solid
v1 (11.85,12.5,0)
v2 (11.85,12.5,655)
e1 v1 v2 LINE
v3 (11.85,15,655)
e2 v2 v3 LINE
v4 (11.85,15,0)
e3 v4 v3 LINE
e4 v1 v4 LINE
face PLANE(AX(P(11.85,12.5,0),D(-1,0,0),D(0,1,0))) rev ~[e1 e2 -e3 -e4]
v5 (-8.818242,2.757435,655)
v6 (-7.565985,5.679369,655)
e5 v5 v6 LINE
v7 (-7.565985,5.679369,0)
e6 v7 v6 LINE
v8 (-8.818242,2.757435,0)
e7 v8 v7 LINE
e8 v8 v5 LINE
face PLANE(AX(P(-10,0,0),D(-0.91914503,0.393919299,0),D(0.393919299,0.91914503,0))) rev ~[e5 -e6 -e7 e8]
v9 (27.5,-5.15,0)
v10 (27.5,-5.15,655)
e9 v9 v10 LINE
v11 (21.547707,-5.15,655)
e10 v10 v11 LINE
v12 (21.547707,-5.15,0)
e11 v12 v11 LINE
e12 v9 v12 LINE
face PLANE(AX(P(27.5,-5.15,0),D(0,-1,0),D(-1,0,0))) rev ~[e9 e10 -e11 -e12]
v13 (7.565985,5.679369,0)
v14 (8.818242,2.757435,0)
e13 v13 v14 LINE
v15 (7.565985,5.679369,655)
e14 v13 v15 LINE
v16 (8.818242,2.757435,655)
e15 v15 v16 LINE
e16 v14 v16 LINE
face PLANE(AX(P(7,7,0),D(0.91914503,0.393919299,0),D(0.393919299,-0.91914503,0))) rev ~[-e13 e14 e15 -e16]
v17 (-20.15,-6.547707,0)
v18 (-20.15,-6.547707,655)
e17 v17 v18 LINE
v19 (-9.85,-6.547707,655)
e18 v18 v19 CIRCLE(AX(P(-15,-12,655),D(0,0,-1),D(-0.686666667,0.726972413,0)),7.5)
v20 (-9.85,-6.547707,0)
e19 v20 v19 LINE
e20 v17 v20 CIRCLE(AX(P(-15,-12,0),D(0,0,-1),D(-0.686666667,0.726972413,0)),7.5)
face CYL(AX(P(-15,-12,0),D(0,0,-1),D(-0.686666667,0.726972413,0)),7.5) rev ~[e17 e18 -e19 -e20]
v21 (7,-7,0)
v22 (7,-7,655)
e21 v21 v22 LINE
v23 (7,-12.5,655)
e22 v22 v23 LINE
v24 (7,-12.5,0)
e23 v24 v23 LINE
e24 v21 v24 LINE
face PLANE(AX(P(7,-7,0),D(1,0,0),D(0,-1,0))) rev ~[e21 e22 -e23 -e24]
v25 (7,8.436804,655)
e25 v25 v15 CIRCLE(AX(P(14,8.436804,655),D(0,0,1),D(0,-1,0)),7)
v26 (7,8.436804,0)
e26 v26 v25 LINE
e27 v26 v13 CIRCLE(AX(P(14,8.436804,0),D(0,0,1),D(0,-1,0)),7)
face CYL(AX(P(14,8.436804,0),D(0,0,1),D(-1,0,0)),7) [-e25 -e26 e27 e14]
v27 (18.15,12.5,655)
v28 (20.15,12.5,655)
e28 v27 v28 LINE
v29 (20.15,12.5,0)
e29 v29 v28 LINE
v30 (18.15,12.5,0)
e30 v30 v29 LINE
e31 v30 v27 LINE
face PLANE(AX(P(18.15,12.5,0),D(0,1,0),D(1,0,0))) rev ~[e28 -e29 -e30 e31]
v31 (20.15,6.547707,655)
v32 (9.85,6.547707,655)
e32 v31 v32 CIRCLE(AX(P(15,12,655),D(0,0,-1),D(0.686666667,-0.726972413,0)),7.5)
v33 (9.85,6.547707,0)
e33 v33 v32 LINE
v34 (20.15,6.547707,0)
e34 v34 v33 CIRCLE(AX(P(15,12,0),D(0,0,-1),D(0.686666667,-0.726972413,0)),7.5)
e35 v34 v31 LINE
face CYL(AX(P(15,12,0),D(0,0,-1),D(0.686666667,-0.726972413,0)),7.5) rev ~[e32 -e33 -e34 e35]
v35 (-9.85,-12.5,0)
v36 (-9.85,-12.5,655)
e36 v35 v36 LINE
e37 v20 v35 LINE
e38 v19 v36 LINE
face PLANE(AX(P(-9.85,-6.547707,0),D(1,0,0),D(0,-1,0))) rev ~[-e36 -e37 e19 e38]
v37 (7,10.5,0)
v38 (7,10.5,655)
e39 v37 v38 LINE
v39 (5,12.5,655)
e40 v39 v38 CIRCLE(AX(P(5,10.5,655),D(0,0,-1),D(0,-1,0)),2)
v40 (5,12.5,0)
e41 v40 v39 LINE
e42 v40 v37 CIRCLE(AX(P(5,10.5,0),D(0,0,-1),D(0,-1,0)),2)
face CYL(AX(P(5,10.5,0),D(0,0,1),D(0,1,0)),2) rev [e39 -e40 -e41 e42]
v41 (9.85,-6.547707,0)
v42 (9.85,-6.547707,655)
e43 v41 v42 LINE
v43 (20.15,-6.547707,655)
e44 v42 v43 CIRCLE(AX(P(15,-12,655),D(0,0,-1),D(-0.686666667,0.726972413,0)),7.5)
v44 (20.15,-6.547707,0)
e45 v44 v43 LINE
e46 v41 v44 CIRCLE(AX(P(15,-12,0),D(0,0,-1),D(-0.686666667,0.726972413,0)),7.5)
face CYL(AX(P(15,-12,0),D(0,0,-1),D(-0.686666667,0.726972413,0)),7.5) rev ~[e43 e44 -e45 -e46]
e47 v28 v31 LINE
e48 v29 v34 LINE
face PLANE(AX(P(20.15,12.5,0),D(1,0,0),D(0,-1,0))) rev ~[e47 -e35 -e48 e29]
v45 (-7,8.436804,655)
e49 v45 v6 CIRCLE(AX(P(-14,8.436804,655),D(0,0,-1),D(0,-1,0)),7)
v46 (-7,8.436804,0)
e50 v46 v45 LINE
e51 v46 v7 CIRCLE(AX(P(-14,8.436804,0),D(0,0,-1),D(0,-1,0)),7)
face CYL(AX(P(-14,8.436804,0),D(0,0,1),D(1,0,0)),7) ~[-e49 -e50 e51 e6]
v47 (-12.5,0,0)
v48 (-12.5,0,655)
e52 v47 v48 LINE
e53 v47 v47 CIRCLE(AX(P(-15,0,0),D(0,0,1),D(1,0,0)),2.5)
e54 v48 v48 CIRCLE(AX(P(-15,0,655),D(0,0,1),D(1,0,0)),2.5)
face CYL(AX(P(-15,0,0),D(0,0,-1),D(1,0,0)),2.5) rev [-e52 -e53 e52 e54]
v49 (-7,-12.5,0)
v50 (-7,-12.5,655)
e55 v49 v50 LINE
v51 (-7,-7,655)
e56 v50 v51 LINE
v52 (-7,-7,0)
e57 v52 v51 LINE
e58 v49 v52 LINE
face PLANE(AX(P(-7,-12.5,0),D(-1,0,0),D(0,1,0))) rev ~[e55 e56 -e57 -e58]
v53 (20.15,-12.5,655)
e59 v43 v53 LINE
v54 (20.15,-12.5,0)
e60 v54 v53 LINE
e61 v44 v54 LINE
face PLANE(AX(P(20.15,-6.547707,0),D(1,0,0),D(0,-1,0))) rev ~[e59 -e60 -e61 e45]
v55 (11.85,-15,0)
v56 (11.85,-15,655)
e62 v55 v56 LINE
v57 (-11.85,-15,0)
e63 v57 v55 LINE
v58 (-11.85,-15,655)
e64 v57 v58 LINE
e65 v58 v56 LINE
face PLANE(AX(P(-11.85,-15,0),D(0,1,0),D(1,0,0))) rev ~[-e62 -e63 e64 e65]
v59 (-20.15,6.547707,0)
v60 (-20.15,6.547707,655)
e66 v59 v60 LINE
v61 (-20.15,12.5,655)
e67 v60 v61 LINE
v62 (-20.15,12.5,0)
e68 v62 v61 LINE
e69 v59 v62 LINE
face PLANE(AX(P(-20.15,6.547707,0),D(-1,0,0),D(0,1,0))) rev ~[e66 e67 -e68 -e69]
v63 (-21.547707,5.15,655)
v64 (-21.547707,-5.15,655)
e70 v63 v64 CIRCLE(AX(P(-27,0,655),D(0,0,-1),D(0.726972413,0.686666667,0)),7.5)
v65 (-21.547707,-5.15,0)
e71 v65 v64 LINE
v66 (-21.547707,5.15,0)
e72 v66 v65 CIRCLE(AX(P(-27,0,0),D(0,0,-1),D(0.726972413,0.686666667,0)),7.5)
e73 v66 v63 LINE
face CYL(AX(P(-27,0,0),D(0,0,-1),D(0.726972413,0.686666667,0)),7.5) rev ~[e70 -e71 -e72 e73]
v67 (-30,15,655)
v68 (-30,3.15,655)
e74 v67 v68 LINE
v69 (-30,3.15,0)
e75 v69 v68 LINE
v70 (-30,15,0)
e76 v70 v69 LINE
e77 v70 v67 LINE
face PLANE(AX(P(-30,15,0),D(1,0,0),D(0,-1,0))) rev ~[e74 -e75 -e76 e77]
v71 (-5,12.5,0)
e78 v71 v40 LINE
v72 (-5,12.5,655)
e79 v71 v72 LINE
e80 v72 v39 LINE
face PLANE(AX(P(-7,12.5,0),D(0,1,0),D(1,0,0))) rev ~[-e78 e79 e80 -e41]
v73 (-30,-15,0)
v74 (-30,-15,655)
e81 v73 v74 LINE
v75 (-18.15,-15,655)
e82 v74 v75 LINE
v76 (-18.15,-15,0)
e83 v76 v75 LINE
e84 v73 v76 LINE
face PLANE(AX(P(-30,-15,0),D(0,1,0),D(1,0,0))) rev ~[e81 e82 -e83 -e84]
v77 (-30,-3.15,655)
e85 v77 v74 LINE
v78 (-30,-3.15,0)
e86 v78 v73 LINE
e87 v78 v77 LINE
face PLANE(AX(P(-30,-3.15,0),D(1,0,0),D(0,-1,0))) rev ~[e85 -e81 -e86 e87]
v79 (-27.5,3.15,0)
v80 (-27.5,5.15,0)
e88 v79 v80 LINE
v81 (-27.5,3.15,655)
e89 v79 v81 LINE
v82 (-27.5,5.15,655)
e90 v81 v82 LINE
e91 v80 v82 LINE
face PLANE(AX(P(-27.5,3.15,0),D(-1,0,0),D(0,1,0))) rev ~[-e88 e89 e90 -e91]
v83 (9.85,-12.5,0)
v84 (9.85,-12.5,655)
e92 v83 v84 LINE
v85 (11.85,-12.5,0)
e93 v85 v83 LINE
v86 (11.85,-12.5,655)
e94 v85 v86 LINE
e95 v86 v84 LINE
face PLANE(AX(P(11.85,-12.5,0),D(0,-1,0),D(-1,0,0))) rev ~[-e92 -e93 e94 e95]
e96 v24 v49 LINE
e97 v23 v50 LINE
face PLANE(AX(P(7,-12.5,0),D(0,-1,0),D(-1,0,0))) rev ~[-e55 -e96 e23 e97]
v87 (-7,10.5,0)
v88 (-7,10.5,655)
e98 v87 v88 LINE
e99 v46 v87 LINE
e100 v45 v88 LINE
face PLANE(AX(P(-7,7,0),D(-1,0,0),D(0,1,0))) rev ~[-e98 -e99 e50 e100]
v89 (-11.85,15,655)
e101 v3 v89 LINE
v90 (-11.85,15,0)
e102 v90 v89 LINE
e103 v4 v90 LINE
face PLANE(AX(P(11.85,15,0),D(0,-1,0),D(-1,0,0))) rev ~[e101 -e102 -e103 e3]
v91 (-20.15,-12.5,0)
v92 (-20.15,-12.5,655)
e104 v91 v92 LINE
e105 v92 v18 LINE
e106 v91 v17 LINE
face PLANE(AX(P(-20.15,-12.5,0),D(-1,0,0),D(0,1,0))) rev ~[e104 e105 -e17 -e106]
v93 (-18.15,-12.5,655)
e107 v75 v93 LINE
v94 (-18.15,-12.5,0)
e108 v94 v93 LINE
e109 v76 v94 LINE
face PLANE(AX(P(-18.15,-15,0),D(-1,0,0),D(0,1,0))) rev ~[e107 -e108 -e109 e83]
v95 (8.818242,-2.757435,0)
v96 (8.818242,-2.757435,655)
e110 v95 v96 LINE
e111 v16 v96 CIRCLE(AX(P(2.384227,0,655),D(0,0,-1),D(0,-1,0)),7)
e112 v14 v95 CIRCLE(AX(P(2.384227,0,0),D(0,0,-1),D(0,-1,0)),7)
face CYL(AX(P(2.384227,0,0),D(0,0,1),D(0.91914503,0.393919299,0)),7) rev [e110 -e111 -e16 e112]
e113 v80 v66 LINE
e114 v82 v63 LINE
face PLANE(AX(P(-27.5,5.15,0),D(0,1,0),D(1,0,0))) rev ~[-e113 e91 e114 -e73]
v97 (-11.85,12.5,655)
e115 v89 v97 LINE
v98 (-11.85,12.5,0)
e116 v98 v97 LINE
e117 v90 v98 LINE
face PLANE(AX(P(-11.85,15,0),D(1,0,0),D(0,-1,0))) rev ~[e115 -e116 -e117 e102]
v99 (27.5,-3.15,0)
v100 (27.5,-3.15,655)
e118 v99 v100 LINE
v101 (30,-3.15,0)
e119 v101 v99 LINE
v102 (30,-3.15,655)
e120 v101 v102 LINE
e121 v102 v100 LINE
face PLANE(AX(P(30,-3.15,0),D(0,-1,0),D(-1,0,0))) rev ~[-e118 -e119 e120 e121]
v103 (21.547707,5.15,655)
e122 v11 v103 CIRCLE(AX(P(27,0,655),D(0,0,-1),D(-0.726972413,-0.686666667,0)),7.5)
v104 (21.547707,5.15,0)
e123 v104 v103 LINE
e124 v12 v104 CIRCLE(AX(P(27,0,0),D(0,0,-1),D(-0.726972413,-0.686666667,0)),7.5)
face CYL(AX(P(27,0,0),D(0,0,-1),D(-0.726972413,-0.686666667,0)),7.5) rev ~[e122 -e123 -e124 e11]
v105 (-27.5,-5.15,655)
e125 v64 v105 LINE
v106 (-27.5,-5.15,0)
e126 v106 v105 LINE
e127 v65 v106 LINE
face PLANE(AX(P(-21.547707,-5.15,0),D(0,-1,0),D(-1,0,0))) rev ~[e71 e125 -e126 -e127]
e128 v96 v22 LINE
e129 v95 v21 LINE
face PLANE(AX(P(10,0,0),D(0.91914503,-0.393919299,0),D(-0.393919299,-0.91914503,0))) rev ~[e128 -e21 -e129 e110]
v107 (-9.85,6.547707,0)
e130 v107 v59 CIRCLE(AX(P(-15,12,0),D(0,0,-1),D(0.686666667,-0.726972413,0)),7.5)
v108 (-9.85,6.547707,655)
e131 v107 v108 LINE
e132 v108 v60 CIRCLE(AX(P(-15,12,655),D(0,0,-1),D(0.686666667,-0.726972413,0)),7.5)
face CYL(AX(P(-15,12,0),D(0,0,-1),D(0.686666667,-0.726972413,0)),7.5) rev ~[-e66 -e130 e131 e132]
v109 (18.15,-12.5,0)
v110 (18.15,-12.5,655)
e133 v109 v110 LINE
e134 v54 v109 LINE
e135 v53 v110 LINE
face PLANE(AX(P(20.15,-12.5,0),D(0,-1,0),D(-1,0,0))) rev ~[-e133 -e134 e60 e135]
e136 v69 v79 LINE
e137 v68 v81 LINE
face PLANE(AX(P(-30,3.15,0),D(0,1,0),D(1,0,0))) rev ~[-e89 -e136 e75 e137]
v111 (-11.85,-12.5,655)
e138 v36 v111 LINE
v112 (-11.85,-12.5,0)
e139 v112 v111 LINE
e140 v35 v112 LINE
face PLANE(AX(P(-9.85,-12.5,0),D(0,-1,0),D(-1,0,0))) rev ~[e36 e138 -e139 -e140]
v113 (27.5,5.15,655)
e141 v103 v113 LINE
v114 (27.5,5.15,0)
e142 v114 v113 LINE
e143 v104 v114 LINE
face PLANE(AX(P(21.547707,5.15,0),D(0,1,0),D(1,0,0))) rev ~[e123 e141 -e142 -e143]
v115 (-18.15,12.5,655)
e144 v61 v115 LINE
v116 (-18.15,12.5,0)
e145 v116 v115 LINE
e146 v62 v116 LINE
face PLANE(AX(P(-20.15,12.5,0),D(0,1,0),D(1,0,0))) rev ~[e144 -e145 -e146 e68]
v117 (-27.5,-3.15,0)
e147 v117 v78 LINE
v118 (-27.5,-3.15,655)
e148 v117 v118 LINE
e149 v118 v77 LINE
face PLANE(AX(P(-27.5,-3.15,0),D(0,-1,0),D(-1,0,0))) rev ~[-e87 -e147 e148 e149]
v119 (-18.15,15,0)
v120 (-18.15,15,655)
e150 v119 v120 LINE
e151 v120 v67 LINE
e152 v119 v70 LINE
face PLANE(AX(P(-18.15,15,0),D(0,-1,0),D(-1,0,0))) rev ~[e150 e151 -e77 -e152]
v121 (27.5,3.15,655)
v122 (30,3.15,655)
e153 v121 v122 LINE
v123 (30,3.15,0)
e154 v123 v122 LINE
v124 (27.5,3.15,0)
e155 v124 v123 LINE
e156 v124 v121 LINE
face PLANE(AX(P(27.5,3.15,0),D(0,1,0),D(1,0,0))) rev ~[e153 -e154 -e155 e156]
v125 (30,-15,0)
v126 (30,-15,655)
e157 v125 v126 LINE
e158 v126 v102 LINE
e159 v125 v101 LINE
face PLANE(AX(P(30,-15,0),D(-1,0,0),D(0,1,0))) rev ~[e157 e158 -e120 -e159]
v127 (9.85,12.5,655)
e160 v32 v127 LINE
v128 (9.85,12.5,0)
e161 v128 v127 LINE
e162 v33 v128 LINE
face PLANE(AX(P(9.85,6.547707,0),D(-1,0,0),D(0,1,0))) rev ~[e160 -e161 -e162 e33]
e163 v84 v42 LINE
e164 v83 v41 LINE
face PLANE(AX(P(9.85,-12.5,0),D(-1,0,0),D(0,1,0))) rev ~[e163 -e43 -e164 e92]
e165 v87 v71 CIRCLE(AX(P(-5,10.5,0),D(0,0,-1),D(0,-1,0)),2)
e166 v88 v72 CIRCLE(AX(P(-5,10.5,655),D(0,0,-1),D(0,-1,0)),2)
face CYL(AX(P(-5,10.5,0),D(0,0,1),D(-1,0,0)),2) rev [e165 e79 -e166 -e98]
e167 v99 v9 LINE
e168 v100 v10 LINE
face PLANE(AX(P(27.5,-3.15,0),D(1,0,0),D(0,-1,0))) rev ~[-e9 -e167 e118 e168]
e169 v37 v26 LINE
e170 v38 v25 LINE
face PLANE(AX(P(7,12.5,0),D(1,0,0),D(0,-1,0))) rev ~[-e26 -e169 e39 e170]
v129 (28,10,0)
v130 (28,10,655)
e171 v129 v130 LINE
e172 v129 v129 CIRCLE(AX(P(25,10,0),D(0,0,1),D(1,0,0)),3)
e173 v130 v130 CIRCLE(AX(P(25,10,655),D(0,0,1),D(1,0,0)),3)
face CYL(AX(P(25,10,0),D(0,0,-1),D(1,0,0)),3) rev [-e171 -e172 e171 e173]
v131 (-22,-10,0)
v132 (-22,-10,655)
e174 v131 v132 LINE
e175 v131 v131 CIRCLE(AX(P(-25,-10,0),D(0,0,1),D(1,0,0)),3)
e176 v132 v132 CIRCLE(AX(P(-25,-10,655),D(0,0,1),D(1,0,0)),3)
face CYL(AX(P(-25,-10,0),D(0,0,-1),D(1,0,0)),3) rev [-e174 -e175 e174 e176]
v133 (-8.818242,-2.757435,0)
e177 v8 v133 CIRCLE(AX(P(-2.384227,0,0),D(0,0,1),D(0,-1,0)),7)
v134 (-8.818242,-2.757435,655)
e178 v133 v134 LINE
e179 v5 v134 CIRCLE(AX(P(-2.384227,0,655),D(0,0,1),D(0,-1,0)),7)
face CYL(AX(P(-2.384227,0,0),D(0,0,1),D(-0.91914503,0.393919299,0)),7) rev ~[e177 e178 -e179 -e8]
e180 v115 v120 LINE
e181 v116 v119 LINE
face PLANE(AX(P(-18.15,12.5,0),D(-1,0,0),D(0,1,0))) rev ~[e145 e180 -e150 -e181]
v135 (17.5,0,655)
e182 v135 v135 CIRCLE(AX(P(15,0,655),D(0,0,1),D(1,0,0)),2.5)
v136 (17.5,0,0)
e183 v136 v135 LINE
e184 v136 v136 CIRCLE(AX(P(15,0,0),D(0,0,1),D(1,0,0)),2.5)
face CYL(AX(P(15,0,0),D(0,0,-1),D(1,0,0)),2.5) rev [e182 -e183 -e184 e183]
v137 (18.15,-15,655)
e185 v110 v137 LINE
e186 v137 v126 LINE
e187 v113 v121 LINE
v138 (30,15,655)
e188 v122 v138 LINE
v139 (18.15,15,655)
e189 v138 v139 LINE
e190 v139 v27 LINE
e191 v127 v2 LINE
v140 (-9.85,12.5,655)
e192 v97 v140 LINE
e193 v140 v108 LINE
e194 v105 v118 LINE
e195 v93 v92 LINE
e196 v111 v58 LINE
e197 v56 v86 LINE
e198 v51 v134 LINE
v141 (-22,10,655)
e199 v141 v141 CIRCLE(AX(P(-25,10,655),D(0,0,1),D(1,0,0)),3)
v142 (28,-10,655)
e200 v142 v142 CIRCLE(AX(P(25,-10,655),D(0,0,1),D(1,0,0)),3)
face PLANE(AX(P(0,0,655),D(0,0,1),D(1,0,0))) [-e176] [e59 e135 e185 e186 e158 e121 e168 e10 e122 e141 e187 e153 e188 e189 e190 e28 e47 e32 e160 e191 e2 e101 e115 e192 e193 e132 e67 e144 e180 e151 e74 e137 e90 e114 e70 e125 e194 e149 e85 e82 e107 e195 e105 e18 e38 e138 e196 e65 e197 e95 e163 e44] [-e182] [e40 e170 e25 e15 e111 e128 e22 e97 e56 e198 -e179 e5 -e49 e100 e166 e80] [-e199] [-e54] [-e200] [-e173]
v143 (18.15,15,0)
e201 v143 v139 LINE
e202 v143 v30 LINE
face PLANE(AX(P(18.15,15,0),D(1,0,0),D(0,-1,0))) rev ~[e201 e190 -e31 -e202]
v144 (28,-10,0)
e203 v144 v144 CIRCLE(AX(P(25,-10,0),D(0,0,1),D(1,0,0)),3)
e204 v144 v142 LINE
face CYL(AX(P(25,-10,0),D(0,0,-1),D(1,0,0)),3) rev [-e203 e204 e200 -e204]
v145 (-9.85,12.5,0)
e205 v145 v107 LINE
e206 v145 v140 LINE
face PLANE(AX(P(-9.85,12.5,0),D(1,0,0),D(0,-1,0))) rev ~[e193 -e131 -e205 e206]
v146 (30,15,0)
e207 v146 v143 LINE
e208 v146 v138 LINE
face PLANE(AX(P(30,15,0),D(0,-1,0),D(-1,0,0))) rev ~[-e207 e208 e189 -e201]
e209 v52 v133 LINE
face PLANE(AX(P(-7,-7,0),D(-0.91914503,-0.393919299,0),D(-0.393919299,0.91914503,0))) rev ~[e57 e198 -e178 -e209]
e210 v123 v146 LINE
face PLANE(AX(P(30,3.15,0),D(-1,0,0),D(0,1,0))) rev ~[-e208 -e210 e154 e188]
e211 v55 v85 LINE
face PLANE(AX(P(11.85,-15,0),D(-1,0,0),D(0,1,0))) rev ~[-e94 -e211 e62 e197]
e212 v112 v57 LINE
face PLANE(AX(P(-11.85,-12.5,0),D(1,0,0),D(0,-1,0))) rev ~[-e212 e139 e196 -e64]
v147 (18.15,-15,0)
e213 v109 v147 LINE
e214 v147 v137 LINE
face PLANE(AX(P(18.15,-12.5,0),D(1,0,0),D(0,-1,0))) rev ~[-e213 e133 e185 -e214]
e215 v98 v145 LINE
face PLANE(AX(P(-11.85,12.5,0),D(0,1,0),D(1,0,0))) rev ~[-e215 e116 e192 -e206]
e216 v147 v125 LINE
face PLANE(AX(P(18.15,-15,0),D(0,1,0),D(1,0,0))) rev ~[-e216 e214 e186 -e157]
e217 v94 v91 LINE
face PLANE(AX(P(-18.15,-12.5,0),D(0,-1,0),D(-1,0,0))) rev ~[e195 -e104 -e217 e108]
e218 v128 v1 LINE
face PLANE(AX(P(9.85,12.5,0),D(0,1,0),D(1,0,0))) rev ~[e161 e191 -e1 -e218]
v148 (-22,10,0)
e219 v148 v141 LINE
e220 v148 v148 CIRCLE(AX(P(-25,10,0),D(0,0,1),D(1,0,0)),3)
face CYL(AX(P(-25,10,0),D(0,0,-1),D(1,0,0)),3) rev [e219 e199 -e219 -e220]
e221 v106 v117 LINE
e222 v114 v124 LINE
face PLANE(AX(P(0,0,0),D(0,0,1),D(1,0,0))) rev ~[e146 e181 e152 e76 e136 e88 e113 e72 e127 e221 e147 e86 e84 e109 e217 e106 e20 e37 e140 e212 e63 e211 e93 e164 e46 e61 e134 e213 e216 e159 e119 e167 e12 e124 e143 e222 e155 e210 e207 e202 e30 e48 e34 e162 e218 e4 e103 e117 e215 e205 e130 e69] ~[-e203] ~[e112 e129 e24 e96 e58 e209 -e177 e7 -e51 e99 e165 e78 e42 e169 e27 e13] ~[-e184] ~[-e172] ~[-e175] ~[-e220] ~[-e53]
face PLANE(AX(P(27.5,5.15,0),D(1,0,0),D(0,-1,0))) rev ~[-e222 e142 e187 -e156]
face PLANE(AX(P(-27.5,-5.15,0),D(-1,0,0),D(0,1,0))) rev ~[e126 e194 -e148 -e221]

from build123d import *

# Parameters (mm, degrees)
F0_R     = 3
F0_R_2   = 2.5
F1_DEPTH = 655
F2_R     = 2
F3_R     = 7


# Not quite as in the source:
# - a feature names something its author has since deleted; it is built from what else it names


with BuildPart() as f1:
    # F0 (on Top) → F1 (new body)
    with BuildSketch(Plane.XY):
        with BuildLine():
            Line((18.15, -15), (30, -15))
            Line((30, -15), (30, -3.15))
            Line((30, -3.15), (27.5, -3.15))
            Line((27.5, -3.15), (27.5, -5.15))
            Line((27.5, -5.15), (21.5477069044, -5.15))
            ThreePointArc((21.5477069044, -5.15), (19.5, 0), (21.5477069044, 5.15))
            Line((21.5477069044, 5.15), (27.5, 5.15))
            Line((27.5, 5.15), (27.5, 3.15))
            Line((27.5, 3.15), (30, 3.15))
            Line((30, 3.15), (30, 15))
            Line((30, 15), (18.15, 15))
            Line((18.15, 15), (18.15, 12.5))
            Line((18.15, 12.5), (20.15, 12.5))
            Line((20.15, 12.5), (20.15, 6.5477069044))
            ThreePointArc((20.15, 6.5477069044), (15, 4.5), (9.85, 6.5477069044))
            Line((9.85, 6.5477069044), (9.85, 12.5))
            Line((9.85, 12.5), (11.85, 12.5))
            Line((11.85, 12.5), (11.85, 15))
            Line((11.85, 15), (-11.85, 15))
            Line((-11.85, 15), (-11.85, 12.5))
            Line((-11.85, 12.5), (-9.85, 12.5))
            Line((-9.85, 12.5), (-9.85, 6.5477069044))
            ThreePointArc((-9.85, 6.5477069044), (-15, 4.5), (-20.15, 6.5477069044))
            Line((-20.15, 6.5477069044), (-20.15, 12.5))
            Line((-20.15, 12.5), (-18.15, 12.5))
            Line((-18.15, 12.5), (-18.15, 15))
            Line((-18.15, 15), (-30, 15))
            Line((-30, 15), (-30, 3.15))
            Line((-30, 3.15), (-27.5, 3.15))
            Line((-27.5, 3.15), (-27.5, 5.15))
            Line((-27.5, 5.15), (-21.5477069044, 5.15))
            ThreePointArc((-21.5477069044, 5.15), (-19.5, 0), (-21.5477069044, -5.15))
            Line((-21.5477069044, -5.15), (-27.5, -5.15))
            Line((-27.5, -5.15), (-27.5, -3.15))
            Line((-27.5, -3.15), (-30, -3.15))
            Line((-30, -3.15), (-30, -15))
            Line((-30, -15), (-18.15, -15))
            Line((-18.15, -15), (-18.15, -12.5))
            Line((-18.15, -12.5), (-20.15, -12.5))
            Line((-20.15, -12.5), (-20.15, -6.5477069044))
            ThreePointArc((-20.15, -6.5477069044), (-15, -4.5), (-9.85, -6.5477069044))
            Line((-9.85, -6.5477069044), (-9.85, -12.5))
            Line((-9.85, -12.5), (-11.85, -12.5))
            Line((-11.85, -12.5), (-11.85, -15))
            Line((-11.85, -15), (11.85, -15))
            Line((11.85, -15), (11.85, -12.5))
            Line((11.85, -12.5), (9.85, -12.5))
            Line((9.85, -12.5), (9.85, -6.5477069044))
            ThreePointArc((9.85, -6.5477069044), (15, -4.5), (20.15, -6.5477069044))
            Line((20.15, -6.5477069044), (20.15, -12.5))
            Line((20.15, -12.5), (18.15, -12.5))
            Line((18.15, -12.5), (18.15, -15))
        make_face()
        with Locations((-25, -10)):
            Circle(F0_R, mode=Mode.SUBTRACT)
        with Locations((25, -10)):
            Circle(F0_R, mode=Mode.SUBTRACT)
        with Locations((-15, 0)):
            Circle(F0_R_2, mode=Mode.SUBTRACT)
        with Locations((-25, 10)):
            Circle(F0_R, mode=Mode.SUBTRACT)
        Polygon((-7, 7), (-7, 12.5), (0, 12.5), (7, 12.5), (7, 7), (10, 0), (7, -7), (7, -12.5), (0, -12.5), (-7, -12.5), (-7, -7), (-10, 0), align=None, mode=Mode.SUBTRACT)
        with Locations((15, 0)):
            Circle(F0_R_2, mode=Mode.SUBTRACT)
        with Locations((25, 10)):
            Circle(F0_R, mode=Mode.SUBTRACT)
    extrude(amount=F1_DEPTH)

    # F2
    f2_edges = [f1.edges().sort_by_distance(p)[0] for p in [
        (-7, 12.5, 327.5),
        (7, 12.5, 327.5),
    ]]
    fillet(f2_edges, radius=F2_R)

    # F3
    f3_edges = [f1.edges().sort_by_distance(p)[0] for p in [
        (-7, 7, 327.5),
        (-10, 0, 327.5),
        (7, 7, 327.5),
        (10, 0, 327.5),
    ]]
    fillet(f3_edges, radius=F3_R)


solid = f1.part
